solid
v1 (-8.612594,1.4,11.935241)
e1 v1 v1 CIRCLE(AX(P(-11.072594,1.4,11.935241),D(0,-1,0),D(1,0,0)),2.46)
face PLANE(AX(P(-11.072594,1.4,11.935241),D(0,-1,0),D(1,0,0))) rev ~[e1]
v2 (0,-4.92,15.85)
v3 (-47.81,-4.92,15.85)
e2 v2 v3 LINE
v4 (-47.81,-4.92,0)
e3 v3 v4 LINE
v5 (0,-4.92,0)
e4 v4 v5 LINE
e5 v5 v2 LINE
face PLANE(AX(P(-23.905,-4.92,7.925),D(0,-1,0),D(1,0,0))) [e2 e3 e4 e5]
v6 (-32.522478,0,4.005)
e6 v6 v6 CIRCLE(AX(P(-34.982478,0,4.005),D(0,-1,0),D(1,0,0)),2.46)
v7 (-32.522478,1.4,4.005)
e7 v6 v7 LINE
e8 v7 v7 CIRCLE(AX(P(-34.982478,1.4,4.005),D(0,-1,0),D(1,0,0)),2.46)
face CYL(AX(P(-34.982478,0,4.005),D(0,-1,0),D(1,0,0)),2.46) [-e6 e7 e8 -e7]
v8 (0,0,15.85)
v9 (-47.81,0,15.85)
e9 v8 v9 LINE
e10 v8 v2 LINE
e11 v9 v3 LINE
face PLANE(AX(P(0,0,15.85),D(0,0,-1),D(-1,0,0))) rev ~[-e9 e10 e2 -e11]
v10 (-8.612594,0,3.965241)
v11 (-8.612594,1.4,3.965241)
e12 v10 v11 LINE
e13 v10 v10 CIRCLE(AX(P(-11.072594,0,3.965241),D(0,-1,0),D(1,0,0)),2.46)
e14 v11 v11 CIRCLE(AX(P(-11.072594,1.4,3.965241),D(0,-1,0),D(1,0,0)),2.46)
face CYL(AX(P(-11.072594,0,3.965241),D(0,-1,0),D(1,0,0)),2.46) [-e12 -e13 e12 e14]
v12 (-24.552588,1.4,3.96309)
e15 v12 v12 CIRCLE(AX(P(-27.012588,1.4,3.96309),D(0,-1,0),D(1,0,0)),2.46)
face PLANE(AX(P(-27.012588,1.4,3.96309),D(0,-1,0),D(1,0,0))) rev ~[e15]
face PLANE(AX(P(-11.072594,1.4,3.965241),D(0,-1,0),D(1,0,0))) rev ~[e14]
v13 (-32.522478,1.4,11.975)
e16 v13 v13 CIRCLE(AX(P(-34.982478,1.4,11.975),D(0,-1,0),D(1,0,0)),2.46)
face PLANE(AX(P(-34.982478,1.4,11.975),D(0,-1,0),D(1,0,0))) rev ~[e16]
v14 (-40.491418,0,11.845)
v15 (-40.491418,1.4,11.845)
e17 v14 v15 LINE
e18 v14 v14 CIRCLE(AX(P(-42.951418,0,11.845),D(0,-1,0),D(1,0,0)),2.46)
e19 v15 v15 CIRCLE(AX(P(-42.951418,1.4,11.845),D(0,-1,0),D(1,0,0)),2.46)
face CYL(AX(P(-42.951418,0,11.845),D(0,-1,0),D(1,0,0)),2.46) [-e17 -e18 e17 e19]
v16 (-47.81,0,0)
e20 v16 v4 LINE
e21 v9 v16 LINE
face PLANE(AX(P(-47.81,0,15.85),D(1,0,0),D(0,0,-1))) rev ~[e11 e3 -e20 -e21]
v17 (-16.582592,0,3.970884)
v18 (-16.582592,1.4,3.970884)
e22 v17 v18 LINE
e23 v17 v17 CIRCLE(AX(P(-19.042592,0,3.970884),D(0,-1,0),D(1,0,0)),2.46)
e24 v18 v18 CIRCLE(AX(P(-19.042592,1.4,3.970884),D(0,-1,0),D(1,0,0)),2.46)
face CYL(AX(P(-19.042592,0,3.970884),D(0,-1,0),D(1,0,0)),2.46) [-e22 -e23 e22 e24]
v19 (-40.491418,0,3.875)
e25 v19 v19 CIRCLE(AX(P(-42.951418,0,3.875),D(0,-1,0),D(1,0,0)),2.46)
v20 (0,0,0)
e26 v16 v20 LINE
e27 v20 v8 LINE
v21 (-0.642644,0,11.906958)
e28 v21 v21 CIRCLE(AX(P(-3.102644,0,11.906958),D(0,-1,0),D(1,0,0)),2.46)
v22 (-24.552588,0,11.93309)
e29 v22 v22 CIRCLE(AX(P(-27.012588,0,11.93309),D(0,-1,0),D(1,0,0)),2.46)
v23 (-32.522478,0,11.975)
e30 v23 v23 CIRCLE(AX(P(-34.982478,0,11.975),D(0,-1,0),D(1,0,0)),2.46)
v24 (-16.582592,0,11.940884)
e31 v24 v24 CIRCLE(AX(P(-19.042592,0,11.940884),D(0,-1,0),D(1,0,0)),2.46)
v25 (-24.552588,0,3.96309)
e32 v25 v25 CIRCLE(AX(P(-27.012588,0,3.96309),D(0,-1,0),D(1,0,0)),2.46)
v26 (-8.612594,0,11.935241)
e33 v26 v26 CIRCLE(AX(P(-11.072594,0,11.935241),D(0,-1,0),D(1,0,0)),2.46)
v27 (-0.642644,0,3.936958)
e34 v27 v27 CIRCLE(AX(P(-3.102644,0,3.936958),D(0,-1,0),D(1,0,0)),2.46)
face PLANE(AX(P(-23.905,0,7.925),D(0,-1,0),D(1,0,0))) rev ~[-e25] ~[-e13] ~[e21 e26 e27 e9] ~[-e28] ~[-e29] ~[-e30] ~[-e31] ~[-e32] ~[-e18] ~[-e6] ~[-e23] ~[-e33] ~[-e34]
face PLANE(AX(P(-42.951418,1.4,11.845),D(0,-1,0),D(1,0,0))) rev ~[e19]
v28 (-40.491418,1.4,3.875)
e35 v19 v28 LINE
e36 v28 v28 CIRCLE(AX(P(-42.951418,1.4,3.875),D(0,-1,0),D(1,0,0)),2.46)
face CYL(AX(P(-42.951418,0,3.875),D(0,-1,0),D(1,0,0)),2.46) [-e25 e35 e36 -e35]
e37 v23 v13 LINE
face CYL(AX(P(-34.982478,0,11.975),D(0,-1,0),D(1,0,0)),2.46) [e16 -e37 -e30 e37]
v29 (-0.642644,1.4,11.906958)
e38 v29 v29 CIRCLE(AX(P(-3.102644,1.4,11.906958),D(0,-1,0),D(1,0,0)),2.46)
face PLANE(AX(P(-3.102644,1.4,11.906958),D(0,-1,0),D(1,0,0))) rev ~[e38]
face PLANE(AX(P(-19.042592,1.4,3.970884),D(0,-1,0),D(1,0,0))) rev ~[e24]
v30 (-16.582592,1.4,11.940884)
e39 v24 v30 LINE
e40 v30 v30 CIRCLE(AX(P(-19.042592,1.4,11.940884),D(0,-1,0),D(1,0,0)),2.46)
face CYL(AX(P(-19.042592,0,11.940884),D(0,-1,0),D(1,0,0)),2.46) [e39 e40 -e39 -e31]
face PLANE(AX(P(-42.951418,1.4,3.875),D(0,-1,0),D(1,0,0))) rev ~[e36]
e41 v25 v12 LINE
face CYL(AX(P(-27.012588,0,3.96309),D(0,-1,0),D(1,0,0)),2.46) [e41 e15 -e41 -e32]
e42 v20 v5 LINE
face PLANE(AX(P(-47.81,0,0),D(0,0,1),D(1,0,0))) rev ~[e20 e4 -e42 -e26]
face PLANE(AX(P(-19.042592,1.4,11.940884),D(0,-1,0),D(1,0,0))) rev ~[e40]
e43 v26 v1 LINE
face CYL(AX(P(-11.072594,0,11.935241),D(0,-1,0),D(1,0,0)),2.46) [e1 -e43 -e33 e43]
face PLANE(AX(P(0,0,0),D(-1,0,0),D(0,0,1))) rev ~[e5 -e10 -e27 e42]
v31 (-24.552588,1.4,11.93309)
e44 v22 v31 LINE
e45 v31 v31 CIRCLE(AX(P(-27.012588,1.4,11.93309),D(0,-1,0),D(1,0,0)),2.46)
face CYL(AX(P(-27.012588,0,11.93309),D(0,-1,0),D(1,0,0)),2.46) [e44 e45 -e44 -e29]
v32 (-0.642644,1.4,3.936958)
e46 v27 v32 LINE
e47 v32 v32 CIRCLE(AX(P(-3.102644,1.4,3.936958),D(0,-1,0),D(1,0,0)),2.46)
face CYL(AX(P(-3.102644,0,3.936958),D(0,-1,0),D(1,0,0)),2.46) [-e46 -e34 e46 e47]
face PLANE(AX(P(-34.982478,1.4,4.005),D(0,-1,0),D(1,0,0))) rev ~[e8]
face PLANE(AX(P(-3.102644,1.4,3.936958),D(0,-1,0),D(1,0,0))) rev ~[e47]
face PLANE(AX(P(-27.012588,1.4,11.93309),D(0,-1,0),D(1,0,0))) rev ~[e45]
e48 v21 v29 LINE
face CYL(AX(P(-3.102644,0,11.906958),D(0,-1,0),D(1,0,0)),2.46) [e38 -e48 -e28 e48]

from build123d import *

# Parameters (mm, degrees)
F0_R     = 2.46
F1_DEPTH = 4.92
F2_R     = 2.46
F4_DEPTH = 1.4


# Not quite as in the source:
# - the program builds the solid bodies; features that only make, move or delete a surface that nothing else refers to are left out


with BuildPart() as f1:
    # F0 (on Front) → F1 (new body)
    with BuildSketch(Plane.XZ):
        Polygon((-47.81, 0), (0, 0), (0, 15.85), (-47.81, 15.85), (-47.81, 4.5985402539), align=None)
        with BuildLine():
            ThreePointArc((-42.89, 4.5985402539), (-45.35, 2.1385402539), (-47.81, 4.5985402539))
            ThreePointArc((-47.81, 4.5985402539), (-45.3923948453, 7.0581749173), (-42.8914612381, 4.6833173524))
            ThreePointArc((-42.8914612381, 4.6833173524), (-42.8903653367, 4.6409350993), (-42.89, 4.5985402539))
        make_face(mode=Mode.SUBTRACT)
        with BuildLine():
            ThreePointArc((-37.9729224851, 4.7680947078), (-40.3905275113, 2.3084600467), (-42.8914612381, 4.6833173524))
            ThreePointArc((-42.8914612381, 4.6833173524), (-40.475317459, 7.227729369), (-37.9729224851, 4.7680947078))
        make_face(mode=Mode.SUBTRACT)
        with Locations((-26.7290156335, 5.1733576693)):
            Circle(F0_R, mode=Mode.SUBTRACT)
        with Locations((-20.1186146587, 3.1614964828)):
            Circle(F0_R, mode=Mode.SUBTRACT)
        with Locations((-13.7956207618, 3.1614964828)):
            Circle(F0_R, mode=Mode.SUBTRACT)
        with BuildLine():
            ThreePointArc((-6.4156207618, 3.1614964828), (-8.8756207618, 0.7014964828), (-11.3356207618, 3.1614964828))
            ThreePointArc((-11.3356207618, 3.1614964828), (-8.8756207618, 5.6214964828), (-6.4156207618, 3.1614964828))
        make_face(mode=Mode.SUBTRACT)
        with Locations((-43.3987230062, 10.9215332195)):
            Circle(F0_R, mode=Mode.SUBTRACT)
        with Locations((-34.7764603794, 10.9215332195)):
            Circle(F0_R, mode=Mode.SUBTRACT)
        with BuildLine():
            ThreePointArc((-24.2718000183, 10.8045228756), (-29.1883194387, 10.9800549535), (-24.2690156335, 10.9215332195))
            ThreePointArc((-24.2690156335, 10.9215332195), (-24.2697118282, 10.8630114856), (-24.2718000183, 10.8045228756))
        make_face(mode=Mode.SUBTRACT)
        with BuildLine():
            ThreePointArc((-19.3545844044, 10.6875125042), (-21.8731061521, 8.2282086993), (-24.2718000183, 10.8045228756))
            ThreePointArc((-24.2718000183, 10.8045228756), (-21.7560626567, 13.1468163092), (-19.3545844044, 10.6875125042))
        make_face(mode=Mode.SUBTRACT)
        with Locations((-13.2208028808, 10.9215332195)):
            Circle(F0_R, mode=Mode.SUBTRACT)
        with Locations((-6.3229943626, 10.9215332195)):
            Circle(F0_R, mode=Mode.SUBTRACT)
        with BuildLine():
            ThreePointArc((-42.8914612381, 4.6833173524), (-45.3923948453, 7.0581749173), (-47.81, 4.5985402539))
            ThreePointArc((-47.81, 4.5985402539), (-45.35, 2.1385402539), (-42.89, 4.5985402539))
            ThreePointArc((-42.89, 4.5985402539), (-42.8903653367, 4.6409350993), (-42.8914612381, 4.6833173524))
        make_face()
        with BuildLine():
            ThreePointArc((-37.9729224851, 4.7680947078), (-40.475317459, 7.227729369), (-42.8914612381, 4.6833173524))
            ThreePointArc((-42.8914612381, 4.6833173524), (-40.3905275113, 2.3084600467), (-37.9729224851, 4.7680947078))
        make_face()
        with Locations((-43.3987230062, 10.9215332195)):
            Circle(F0_R)
        with Locations((-26.7290156335, 5.1733576693)):
            Circle(F0_R)
        with BuildLine():
            ThreePointArc((-24.2718000183, 10.8045228756), (-24.2697118282, 10.8630114856), (-24.2690156335, 10.9215332195))
            ThreePointArc((-24.2690156335, 10.9215332195), (-29.1883194387, 10.9800549535), (-24.2718000183, 10.8045228756))
        make_face()
        with BuildLine():
            ThreePointArc((-19.3545844044, 10.6875125042), (-21.7560626567, 13.1468163092), (-24.2718000183, 10.8045228756))
            ThreePointArc((-24.2718000183, 10.8045228756), (-21.8731061521, 8.2282086993), (-19.3545844044, 10.6875125042))
        make_face()
        with Locations((-20.1186146587, 3.1614964828)):
            Circle(F0_R)
        with Locations((-13.7956207618, 3.1614964828)):
            Circle(F0_R)
        with BuildLine():
            ThreePointArc((-6.4156207618, 3.1614964828), (-8.8756207618, 5.6214964828), (-11.3356207618, 3.1614964828))
            ThreePointArc((-11.3356207618, 3.1614964828), (-8.8756207618, 0.7014964828), (-6.4156207618, 3.1614964828))
        make_face()
        with Locations((-13.2208028808, 10.9215332195)):
            Circle(F0_R)
        with Locations((-6.3229943626, 10.9215332195)):
            Circle(F0_R)
        with Locations((-34.7764603794, 10.9215332195)):
            Circle(F0_R)
    extrude(amount=F1_DEPTH)

    # F2 (on Front) → F4 (join)
    with BuildSketch(Plane.XZ):
        with Locations((-42.9514177962, 11.845)):
            Circle(F2_R)
        with Locations((-42.9514177962, 3.875)):
            Circle(F2_R)
        with Locations((-34.9824780926, 11.975)):
            Circle(F2_R)
        with Locations((-34.9824780926, 4.005)):
            Circle(F2_R)
        with Locations((-27.0125882826, 11.9330903837)):
            Circle(F2_R)
        with Locations((-19.0425920932, 11.9408840209)):
            Circle(F2_R)
        with Locations((-11.0725940906, 3.9652414555)):
            Circle(F2_R)
        with Locations((-11.0725940906, 11.9352414555)):
            Circle(F2_R)
        with Locations((-3.1026442768, 3.9369577962)):
            Circle(F2_R)
        with Locations((-3.1026442768, 11.9069577962)):
            Circle(F2_R)
        with Locations((-19.0425920932, 3.9708840209)):
            Circle(F2_R)
        with Locations((-27.0125882826, 3.9630903837)):
            Circle(F2_R)
    extrude(amount=-F4_DEPTH)


solid = f1.part
